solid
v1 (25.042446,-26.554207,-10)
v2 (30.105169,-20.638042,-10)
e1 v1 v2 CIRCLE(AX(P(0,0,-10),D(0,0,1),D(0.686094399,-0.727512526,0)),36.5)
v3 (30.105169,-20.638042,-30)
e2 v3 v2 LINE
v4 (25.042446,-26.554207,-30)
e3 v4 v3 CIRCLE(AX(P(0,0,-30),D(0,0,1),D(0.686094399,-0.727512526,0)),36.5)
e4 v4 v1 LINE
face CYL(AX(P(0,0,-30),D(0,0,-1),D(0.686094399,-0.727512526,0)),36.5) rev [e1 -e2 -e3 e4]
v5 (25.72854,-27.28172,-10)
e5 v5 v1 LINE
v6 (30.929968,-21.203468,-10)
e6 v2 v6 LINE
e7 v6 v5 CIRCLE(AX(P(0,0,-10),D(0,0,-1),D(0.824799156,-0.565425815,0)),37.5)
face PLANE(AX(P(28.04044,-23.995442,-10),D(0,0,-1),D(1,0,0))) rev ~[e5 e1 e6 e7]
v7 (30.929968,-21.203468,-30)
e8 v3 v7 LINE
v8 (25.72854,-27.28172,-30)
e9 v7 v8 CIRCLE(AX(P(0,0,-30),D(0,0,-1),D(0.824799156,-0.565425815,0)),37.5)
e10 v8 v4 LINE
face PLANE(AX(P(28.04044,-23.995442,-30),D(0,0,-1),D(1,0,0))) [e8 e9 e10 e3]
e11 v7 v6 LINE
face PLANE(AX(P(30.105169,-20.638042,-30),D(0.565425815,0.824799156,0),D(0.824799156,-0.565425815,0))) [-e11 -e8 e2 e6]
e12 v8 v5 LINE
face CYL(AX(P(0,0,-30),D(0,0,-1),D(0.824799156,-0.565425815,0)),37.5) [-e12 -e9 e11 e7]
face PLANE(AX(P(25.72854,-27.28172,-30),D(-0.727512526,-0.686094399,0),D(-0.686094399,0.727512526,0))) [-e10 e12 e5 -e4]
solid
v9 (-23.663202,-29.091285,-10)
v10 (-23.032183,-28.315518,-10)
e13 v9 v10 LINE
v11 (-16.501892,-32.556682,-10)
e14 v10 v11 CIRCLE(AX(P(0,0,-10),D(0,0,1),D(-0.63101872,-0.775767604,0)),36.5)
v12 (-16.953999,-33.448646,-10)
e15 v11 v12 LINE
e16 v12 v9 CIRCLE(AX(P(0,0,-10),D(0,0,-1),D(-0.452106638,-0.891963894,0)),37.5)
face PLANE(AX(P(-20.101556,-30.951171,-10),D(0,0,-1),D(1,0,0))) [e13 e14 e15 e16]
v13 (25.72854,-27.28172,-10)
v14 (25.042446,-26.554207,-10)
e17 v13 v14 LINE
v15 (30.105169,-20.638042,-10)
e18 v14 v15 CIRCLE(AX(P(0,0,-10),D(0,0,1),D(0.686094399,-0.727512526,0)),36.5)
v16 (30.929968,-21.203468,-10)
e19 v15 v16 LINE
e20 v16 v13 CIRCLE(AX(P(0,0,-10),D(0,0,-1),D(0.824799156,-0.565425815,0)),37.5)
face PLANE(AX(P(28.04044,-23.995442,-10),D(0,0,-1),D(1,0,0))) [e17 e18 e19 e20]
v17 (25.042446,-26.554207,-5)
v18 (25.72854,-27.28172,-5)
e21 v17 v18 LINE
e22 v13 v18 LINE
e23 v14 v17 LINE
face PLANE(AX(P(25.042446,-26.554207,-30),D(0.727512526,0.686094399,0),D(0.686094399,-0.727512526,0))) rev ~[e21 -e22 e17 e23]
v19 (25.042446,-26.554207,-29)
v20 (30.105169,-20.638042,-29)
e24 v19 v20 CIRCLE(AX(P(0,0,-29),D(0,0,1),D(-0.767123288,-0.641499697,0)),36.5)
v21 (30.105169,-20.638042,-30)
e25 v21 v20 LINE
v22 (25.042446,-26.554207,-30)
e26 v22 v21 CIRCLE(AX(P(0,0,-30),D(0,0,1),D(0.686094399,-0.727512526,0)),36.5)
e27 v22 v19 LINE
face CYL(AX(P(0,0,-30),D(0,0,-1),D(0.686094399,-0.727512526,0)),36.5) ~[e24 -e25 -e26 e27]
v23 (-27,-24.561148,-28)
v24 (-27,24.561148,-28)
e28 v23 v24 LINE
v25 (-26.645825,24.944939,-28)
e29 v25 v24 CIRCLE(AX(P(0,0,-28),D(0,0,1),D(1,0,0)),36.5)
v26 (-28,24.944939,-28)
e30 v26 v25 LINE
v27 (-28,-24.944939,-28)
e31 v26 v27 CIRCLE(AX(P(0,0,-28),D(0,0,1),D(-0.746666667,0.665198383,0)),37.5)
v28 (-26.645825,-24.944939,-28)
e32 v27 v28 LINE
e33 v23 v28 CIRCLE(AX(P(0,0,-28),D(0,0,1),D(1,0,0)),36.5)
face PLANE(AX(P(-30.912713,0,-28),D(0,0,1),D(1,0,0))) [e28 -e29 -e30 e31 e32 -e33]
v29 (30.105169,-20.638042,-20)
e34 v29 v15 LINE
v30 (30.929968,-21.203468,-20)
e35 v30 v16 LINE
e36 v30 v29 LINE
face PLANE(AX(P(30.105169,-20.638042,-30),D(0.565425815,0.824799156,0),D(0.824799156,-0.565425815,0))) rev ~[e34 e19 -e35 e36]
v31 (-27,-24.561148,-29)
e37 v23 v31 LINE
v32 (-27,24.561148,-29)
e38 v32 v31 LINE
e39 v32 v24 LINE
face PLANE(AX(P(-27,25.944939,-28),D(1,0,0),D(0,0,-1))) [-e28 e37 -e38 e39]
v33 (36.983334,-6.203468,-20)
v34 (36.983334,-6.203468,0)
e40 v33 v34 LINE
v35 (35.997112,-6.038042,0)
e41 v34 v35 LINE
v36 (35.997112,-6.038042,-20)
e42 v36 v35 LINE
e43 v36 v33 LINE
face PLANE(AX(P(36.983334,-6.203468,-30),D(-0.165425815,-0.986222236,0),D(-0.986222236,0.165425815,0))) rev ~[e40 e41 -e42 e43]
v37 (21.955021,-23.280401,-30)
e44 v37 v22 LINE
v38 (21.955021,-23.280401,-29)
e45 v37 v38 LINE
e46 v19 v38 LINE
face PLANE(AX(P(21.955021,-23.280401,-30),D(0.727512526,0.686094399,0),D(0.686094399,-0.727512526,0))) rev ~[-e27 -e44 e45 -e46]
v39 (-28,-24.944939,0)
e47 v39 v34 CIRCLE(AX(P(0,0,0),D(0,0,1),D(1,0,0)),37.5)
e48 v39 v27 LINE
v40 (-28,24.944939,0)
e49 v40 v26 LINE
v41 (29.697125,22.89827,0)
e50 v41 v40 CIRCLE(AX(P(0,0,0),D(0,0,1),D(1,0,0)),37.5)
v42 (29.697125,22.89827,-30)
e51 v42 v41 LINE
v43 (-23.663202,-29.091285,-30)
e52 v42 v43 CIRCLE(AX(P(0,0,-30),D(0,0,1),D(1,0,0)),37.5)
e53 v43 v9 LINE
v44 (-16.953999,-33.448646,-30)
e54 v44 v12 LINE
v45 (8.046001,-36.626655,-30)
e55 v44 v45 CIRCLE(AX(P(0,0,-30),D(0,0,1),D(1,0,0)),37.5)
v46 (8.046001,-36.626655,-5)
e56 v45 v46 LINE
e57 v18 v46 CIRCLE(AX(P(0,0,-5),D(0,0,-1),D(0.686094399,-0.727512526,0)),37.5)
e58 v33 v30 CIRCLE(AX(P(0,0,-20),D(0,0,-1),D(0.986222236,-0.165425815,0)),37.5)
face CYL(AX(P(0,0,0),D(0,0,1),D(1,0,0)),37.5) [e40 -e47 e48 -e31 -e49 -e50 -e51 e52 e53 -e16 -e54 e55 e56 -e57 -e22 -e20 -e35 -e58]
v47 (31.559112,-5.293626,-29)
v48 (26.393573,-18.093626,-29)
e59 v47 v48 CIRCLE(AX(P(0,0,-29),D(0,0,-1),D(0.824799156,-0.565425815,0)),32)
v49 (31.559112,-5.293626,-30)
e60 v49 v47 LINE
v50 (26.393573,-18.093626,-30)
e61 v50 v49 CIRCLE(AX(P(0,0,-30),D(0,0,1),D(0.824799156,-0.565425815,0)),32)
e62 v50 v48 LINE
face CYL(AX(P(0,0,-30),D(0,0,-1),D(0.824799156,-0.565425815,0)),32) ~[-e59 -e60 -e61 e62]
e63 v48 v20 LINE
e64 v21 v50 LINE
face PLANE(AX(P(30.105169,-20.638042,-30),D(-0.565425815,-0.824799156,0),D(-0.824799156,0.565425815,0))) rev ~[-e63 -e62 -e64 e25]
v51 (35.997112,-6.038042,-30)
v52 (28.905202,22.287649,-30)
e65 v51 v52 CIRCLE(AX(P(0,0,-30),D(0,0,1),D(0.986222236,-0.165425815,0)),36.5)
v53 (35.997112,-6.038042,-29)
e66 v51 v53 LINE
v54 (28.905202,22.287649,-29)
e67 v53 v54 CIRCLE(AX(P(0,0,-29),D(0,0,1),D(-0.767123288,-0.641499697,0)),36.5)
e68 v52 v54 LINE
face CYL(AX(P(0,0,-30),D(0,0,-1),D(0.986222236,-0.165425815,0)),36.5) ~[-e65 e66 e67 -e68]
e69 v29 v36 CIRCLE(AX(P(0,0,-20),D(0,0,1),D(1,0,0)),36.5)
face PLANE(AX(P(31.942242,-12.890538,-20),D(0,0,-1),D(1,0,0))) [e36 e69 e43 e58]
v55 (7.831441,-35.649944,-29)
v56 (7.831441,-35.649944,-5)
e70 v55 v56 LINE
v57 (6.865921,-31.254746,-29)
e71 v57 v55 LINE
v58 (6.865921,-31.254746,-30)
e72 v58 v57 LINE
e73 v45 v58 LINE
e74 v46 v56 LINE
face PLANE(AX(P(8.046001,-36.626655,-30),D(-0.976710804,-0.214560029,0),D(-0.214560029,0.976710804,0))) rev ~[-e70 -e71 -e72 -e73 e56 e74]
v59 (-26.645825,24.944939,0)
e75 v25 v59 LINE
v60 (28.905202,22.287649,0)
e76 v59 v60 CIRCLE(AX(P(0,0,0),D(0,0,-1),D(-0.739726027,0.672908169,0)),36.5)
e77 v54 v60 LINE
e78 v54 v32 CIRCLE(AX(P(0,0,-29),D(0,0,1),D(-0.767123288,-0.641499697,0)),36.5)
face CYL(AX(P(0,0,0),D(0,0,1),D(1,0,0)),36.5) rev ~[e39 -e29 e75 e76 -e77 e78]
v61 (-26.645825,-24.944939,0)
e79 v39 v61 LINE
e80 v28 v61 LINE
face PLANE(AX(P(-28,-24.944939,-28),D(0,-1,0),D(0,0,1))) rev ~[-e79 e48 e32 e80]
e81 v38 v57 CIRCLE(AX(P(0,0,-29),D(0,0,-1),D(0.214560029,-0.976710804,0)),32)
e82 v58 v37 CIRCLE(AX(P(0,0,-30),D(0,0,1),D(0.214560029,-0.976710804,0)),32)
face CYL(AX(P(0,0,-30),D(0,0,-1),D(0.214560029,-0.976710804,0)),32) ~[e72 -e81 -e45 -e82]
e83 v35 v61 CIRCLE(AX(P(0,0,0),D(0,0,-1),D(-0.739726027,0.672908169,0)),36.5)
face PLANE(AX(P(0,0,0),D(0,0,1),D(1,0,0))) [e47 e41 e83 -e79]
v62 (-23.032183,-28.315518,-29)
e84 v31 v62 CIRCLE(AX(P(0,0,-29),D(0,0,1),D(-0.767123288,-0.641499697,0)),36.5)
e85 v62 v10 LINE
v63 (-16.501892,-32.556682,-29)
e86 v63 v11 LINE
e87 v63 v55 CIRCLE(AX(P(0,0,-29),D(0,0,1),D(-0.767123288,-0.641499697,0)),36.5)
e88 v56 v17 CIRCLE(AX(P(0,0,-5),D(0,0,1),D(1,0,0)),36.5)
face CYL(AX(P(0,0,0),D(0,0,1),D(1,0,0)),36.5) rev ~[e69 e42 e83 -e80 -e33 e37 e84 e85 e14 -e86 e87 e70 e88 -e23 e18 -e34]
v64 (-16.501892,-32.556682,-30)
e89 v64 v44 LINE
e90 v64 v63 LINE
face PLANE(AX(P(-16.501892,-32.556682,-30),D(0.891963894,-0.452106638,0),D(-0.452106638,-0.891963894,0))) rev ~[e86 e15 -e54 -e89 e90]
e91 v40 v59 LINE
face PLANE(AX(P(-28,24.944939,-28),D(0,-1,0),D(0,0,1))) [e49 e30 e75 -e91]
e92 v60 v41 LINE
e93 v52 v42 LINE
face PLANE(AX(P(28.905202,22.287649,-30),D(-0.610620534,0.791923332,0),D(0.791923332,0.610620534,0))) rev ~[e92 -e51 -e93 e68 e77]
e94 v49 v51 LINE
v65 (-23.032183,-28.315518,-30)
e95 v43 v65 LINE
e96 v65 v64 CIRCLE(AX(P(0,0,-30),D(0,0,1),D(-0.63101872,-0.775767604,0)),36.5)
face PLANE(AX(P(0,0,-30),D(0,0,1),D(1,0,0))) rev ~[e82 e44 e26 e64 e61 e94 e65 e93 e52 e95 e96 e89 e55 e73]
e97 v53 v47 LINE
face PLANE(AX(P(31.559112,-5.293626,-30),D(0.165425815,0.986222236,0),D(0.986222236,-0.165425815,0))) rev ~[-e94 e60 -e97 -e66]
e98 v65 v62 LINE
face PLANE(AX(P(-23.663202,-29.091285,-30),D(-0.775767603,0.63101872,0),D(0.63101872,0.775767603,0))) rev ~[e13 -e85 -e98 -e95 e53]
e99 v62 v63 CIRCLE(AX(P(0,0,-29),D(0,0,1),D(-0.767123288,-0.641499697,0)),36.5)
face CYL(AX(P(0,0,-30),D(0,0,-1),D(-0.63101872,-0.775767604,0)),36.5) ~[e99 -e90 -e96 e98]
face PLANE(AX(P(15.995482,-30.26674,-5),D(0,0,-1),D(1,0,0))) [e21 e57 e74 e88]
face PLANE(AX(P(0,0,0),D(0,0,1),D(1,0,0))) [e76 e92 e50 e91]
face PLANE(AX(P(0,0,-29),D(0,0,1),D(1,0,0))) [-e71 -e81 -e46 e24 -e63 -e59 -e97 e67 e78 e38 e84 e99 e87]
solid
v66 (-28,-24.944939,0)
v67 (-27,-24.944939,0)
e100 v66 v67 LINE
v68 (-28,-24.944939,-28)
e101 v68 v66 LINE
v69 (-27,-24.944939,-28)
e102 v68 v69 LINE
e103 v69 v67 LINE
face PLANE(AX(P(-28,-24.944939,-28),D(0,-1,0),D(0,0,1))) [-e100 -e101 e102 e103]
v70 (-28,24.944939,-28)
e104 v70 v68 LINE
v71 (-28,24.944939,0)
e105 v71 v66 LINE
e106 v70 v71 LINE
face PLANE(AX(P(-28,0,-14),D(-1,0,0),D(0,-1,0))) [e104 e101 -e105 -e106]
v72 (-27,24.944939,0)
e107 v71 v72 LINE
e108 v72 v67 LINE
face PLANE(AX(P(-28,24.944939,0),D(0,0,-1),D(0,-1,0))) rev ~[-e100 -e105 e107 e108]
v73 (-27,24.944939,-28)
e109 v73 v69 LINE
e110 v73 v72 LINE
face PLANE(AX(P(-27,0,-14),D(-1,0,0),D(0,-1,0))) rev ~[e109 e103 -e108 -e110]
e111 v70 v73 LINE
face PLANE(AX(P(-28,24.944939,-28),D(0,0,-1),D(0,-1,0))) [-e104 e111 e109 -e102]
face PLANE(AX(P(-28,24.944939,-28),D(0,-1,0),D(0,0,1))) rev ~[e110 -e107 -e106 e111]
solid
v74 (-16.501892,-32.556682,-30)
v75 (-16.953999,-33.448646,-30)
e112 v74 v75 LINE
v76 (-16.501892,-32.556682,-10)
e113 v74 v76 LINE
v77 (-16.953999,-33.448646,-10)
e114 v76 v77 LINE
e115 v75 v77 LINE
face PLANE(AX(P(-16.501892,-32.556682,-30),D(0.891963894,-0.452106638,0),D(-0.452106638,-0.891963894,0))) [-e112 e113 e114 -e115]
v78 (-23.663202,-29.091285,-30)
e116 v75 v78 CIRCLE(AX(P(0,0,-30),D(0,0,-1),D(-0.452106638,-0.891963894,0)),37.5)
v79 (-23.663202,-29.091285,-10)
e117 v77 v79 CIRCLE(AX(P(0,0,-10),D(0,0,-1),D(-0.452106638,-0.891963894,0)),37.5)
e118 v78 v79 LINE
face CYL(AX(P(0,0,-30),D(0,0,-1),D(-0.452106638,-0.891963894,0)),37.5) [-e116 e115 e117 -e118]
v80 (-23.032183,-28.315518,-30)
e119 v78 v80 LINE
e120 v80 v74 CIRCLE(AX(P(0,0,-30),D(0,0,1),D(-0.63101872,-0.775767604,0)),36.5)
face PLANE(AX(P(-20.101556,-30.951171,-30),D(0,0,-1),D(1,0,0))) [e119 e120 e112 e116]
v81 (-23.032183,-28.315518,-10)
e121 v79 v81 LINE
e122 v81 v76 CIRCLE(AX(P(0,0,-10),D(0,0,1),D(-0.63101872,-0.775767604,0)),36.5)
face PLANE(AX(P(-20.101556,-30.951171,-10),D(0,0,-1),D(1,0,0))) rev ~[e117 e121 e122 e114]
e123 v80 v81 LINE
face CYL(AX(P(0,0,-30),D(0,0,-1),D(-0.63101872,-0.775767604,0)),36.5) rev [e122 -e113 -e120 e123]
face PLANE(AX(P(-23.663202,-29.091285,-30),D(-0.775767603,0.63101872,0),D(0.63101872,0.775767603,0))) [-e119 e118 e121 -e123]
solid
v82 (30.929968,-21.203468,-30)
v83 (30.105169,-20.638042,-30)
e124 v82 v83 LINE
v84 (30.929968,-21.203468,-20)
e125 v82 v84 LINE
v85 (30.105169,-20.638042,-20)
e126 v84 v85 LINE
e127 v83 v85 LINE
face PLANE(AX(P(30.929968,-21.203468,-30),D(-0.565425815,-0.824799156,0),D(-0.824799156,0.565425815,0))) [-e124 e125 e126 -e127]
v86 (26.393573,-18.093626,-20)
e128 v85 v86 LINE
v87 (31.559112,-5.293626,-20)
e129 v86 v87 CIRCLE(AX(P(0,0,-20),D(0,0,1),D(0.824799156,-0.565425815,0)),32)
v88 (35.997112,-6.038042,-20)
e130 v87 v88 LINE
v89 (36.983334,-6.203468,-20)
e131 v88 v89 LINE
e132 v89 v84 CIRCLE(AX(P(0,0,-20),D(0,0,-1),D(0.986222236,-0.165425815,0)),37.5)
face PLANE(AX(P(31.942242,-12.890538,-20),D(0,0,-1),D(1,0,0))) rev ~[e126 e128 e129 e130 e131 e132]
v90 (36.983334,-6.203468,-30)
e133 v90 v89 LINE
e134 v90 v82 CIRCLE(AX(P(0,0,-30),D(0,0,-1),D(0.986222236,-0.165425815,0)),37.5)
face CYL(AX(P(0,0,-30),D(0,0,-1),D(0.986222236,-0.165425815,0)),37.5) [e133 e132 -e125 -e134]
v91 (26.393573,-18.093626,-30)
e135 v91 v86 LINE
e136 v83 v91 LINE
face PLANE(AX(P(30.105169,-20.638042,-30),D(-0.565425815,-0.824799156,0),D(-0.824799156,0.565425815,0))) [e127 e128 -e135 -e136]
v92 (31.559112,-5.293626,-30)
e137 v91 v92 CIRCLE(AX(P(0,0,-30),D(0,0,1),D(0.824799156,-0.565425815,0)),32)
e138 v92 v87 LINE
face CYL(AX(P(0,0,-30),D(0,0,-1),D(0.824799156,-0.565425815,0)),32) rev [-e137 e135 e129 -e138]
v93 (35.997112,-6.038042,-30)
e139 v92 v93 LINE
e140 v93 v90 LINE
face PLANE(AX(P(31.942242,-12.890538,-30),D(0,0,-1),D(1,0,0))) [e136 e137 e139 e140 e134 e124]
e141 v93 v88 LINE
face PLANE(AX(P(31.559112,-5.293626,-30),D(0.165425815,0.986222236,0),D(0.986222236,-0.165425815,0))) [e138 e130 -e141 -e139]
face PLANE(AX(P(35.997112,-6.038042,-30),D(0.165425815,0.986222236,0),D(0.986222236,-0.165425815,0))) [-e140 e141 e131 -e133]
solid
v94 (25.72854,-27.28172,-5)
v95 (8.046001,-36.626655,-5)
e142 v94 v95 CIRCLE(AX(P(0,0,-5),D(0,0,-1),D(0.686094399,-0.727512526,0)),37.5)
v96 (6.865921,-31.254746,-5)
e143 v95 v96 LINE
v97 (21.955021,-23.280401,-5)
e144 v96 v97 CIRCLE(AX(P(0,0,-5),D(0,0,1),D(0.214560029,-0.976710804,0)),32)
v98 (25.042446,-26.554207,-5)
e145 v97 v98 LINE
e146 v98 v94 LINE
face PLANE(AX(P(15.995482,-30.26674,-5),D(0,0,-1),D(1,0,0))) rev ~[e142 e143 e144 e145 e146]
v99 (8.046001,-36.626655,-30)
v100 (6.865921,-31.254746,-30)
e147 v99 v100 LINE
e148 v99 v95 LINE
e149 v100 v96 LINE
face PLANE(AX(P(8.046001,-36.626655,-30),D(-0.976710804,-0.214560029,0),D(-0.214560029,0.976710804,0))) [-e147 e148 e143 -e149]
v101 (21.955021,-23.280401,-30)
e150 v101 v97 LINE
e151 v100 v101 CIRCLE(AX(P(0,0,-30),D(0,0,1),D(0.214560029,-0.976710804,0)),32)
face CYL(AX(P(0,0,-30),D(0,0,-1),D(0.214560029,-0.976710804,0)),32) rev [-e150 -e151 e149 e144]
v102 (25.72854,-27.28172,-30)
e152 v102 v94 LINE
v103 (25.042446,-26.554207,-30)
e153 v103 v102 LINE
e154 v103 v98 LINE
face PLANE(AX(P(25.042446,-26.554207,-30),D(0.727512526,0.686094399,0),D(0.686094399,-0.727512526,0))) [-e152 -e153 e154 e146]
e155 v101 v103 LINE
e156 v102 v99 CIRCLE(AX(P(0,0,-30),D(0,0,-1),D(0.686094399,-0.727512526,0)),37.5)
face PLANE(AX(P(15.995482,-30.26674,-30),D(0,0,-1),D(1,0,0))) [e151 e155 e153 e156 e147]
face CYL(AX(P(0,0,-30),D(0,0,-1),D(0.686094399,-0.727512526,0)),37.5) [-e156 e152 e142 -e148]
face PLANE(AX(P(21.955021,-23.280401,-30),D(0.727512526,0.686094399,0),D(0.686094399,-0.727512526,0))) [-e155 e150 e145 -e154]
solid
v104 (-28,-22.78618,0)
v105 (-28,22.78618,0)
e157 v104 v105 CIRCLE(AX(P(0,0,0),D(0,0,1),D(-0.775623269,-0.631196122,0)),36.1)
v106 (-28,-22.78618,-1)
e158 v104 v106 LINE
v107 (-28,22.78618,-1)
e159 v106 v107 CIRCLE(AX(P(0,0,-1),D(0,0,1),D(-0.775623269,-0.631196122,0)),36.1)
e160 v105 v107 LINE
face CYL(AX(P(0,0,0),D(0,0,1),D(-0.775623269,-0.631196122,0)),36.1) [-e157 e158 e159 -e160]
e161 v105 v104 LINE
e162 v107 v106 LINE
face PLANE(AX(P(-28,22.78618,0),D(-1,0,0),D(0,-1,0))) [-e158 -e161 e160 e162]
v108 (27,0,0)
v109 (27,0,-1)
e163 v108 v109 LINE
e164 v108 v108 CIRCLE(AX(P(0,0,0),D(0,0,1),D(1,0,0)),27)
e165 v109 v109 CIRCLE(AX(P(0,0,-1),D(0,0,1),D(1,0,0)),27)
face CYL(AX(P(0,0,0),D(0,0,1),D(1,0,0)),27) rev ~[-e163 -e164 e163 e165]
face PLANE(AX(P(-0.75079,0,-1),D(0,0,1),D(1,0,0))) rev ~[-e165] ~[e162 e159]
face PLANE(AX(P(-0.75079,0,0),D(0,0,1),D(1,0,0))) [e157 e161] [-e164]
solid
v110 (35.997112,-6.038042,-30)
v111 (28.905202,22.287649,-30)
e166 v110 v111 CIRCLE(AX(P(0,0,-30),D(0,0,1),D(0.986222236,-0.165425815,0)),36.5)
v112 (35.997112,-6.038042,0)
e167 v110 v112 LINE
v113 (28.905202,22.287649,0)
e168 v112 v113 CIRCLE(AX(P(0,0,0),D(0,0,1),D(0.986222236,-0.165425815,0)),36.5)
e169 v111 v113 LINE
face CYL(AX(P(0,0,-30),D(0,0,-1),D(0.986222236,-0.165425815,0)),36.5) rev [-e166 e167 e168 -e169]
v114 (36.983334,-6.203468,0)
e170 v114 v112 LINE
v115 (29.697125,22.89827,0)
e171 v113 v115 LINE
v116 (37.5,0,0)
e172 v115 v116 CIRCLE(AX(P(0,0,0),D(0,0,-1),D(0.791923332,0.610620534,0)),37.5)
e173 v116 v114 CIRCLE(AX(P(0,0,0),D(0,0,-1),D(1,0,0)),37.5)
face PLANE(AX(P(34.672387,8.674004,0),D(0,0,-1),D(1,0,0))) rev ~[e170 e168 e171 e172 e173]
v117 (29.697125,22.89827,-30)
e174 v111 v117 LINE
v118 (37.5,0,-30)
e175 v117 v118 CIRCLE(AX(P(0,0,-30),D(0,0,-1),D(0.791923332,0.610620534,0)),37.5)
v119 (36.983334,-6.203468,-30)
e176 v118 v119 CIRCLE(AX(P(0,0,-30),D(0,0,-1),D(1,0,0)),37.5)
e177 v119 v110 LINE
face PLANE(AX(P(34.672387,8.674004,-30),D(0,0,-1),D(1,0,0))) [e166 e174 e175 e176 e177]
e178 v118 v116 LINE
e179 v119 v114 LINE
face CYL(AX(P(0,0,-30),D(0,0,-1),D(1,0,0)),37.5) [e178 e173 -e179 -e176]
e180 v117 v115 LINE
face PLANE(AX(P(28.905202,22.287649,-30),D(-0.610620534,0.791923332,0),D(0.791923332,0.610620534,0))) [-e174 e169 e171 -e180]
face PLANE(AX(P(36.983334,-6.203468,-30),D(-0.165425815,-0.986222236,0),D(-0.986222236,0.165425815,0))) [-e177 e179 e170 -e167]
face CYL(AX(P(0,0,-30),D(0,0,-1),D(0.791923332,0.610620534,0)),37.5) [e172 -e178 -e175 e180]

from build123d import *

# Parameters (mm, degrees)
F0_R        = 37.5
F1_DEPTH    = 30
F3_DEPTH    = 28
F8_T        = 1
F8_T3_DEPTH = 51.8898787331
F9_DEPTH    = 20
F10_DEPTH   = 20
F11_DEPTH   = 25
F12_DEPTH   = 25
F13_DEPTH   = 10
F14_DEPTH   = 10
F15_DEPTH   = 30
F16_DEPTH   = 30
F17_DEPTH   = 20
F18_DEPTH   = 20
F19_W       = 49.8898787331
F19_H       = 28
F20_DEPTH   = 1.3551748111
F21_DEPTH   = 1
F4_R        = 27
F22_DEPTH   = 1


# Not quite as in the source:
# - a shell that OpenCascade refuses in one call is made with other operations: the cavity is built on its own and cut out


with BuildPart() as f1:
    # F0 (on Top) → F1 (new body)
    with BuildSketch(Plane.XY):
        Circle(F0_R)
    extrude(amount=-F1_DEPTH)

    # F2 (on face) → F3 (cut)
    with BuildSketch(Plane.XY):
        with BuildLine():
            Line((-28, -24.9449393665), (-28, 24.9449393665))
            ThreePointArc((-28, 24.9449393665), (-37.5, 0), (-28, -24.9449393665))
        make_face()
    extrude(amount=-F3_DEPTH, mode=Mode.SUBTRACT)

    # F8: shell of thickness 1, made by hand


with BuildPart() as f8_core1:
    # F8_t2: copy of F1
    add(f1.part)

    # the walls: a layer under each face that stays
    f8_faces = [f8_core1.faces().sort_by_distance(p)[0] for p in [
        (18.75, 32.4759526419, -25),
        (-28, 0, -14),
        (-32.75, 0, -28),
        (0, 0, -30),
    ]]
    thicken(f8_faces, amount=-F8_T, mode=Mode.SUBTRACT)

    # F8_s4 → F8_t3 (cut)
    with BuildSketch(Plane.XZ.offset(-25.9449393665)):
        Polygon((-28.01, -27.99), (-27, -28), (-27, -29), (-28, -29), align=None)
    extrude(amount=F8_T3_DEPTH, mode=Mode.SUBTRACT)


with BuildPart() as f1_1:
    add(f1.part)

    # what is left inside the walls is the cavity
    f8_cavity = [f8_core1.part.solids().sort_by_distance(p)[0] for p in [
        (36.49, 0, -19.333333),
    ]]
    add(f8_cavity, mode=Mode.SUBTRACT)

    # F6 (on face) → F9 (cut)
    with BuildSketch(Plane(origin=(0, 0, -30), x_dir=(1, 0, 0), z_dir=(0, 0, -1))):
        with BuildLine():
            ThreePointArc((-16.953998922, 33.4486460197), (-20.4251291644, 31.4493894793), (-23.6632020109, 29.0912851313))
            Line((-23.6632020109, 29.0912851313), (-23.0321832906, 28.3155175278))
            ThreePointArc((-23.0321832906, 28.3155175278), (-19.8804590533, 30.6107390931), (-16.501892284, 32.5566821259))
            Line((-16.501892284, 32.5566821259), (-16.953998922, 33.4486460197))
        make_face()
    extrude(amount=-F9_DEPTH, mode=Mode.SUBTRACT)

    # F7 (on face) → F11 (cut)
    with BuildSketch(Plane(origin=(0, 0, -30), x_dir=(1, 0, 0), z_dir=(0, 0, -1))):
        with BuildLine():
            ThreePointArc((25.7285399775, 27.2817197153), (17.5217539189, 33.1547604365), (8.046001078, 36.6266551387))
            Line((8.046001078, 36.6266551387), (6.8659209199, 31.2547457184))
            ThreePointArc((6.8659209199, 31.2547457184), (14.9518966775, 28.2920622392), (21.9550207808, 23.2804008237))
            Line((21.9550207808, 23.2804008237), (25.0424455781, 26.5542071896))
            Line((25.0424455781, 26.5542071896), (25.7285399775, 27.2817197153))
        make_face()
    extrude(amount=-F11_DEPTH, mode=Mode.SUBTRACT)

    # F7 (on face) → F13 (cut)
    with BuildSketch(Plane(origin=(0, 0, -30), x_dir=(1, 0, 0), z_dir=(0, 0, -1))):
        with BuildLine():
            ThreePointArc((36.9833338658, 6.2034680763), (34.7750507424, 14.0337395539), (30.9299683404, 21.2034680763))
            Line((30.9299683404, 21.2034680763), (30.1051691846, 20.638042261))
            Line((30.1051691846, 20.638042261), (26.3935729838, 18.0936260918))
            ThreePointArc((26.3935729838, 18.0936260918), (29.6747099668, 11.9754577526), (31.5591115654, 5.2936260918))
            Line((31.5591115654, 5.2936260918), (35.9971116293, 6.038042261))
            Line((35.9971116293, 6.038042261), (36.9833338658, 6.2034680763))
        make_face()
    extrude(amount=-F13_DEPTH, mode=Mode.SUBTRACT)

    # F7 (on face) → F15 (cut)
    with BuildSketch(Plane(origin=(0, 0, -30), x_dir=(1, 0, 0), z_dir=(0, 0, -1))):
        with BuildLine():
            Line((28.9052016216, -22.2876494771), (29.6971249537, -22.8982700107))
            ThreePointArc((29.6971249537, -22.8982700107), (35.49571936, -12.0956152021), (37.5, 0))
            ThreePointArc((37.5, 0), (37.3706102437, 3.1124732958), (36.9833338658, 6.2034680763))
            Line((36.9833338658, 6.2034680763), (35.9971116293, 6.038042261))
            ThreePointArc((35.9971116293, 6.038042261), (35.4071146726, -8.8648875097), (28.9052016216, -22.2876494771))
        make_face()
    extrude(amount=-F15_DEPTH, mode=Mode.SUBTRACT)

    # F7 (on face) → F17 (cut)
    with BuildSketch(Plane(origin=(0, 0, -30), x_dir=(1, 0, 0), z_dir=(0, 0, -1))):
        with BuildLine():
            ThreePointArc((30.9299683404, 21.2034680763), (28.4918045576, 24.3816954507), (25.7285399775, 27.2817197153))
            Line((25.7285399775, 27.2817197153), (25.0424455781, 26.5542071896))
            ThreePointArc((25.0424455781, 26.5542071896), (27.7320231027, 23.7315169054), (30.1051691846, 20.638042261))
            Line((30.1051691846, 20.638042261), (30.9299683404, 21.2034680763))
        make_face()
    extrude(amount=-F17_DEPTH, mode=Mode.SUBTRACT)

    # F19 (on face) → F20 (cut, through all)
    with BuildSketch(Plane(origin=(-28, 0, 0), x_dir=(0, -1, 0), z_dir=(-1, 0, 0))):
        with Locations((0, -14)):
            Rectangle(F19_W, F19_H)
    extrude(amount=-F20_DEPTH, mode=Mode.SUBTRACT)


with BuildPart() as f10:
    # F6 (on face) → F10 (new body)
    with BuildSketch(Plane(origin=(0, 0, -30), x_dir=(1, 0, 0), z_dir=(0, 0, -1))):
        with BuildLine():
            ThreePointArc((-16.953998922, 33.4486460197), (-20.4251291644, 31.4493894793), (-23.6632020109, 29.0912851313))
            Line((-23.6632020109, 29.0912851313), (-23.0321832906, 28.3155175278))
            ThreePointArc((-23.0321832906, 28.3155175278), (-19.8804590533, 30.6107390931), (-16.501892284, 32.5566821259))
            Line((-16.501892284, 32.5566821259), (-16.953998922, 33.4486460197))
        make_face()
    extrude(amount=-F10_DEPTH)


with BuildPart() as f12:
    # F7 (on face) → F12 (new body)
    with BuildSketch(Plane(origin=(0, 0, -30), x_dir=(1, 0, 0), z_dir=(0, 0, -1))):
        with BuildLine():
            ThreePointArc((25.7285399775, 27.2817197153), (17.5217539189, 33.1547604365), (8.046001078, 36.6266551387))
            Line((8.046001078, 36.6266551387), (6.8659209199, 31.2547457184))
            ThreePointArc((6.8659209199, 31.2547457184), (14.9518966775, 28.2920622392), (21.9550207808, 23.2804008237))
            Line((21.9550207808, 23.2804008237), (25.0424455781, 26.5542071896))
            Line((25.0424455781, 26.5542071896), (25.7285399775, 27.2817197153))
        make_face()
    extrude(amount=-F12_DEPTH)


with BuildPart() as f14:
    # F7 (on face) → F14 (new body)
    with BuildSketch(Plane(origin=(0, 0, -30), x_dir=(1, 0, 0), z_dir=(0, 0, -1))):
        with BuildLine():
            ThreePointArc((36.9833338658, 6.2034680763), (34.7750507424, 14.0337395539), (30.9299683404, 21.2034680763))
            Line((30.9299683404, 21.2034680763), (30.1051691846, 20.638042261))
            Line((30.1051691846, 20.638042261), (26.3935729838, 18.0936260918))
            ThreePointArc((26.3935729838, 18.0936260918), (29.6747099668, 11.9754577526), (31.5591115654, 5.2936260918))
            Line((31.5591115654, 5.2936260918), (35.9971116293, 6.038042261))
            Line((35.9971116293, 6.038042261), (36.9833338658, 6.2034680763))
        make_face()
    extrude(amount=-F14_DEPTH)


with BuildPart() as f16:
    # F7 (on face) → F16 (new body)
    with BuildSketch(Plane(origin=(0, 0, -30), x_dir=(1, 0, 0), z_dir=(0, 0, -1))):
        with BuildLine():
            Line((28.9052016216, -22.2876494771), (29.6971249537, -22.8982700107))
            ThreePointArc((29.6971249537, -22.8982700107), (35.49571936, -12.0956152021), (37.5, 0))
            ThreePointArc((37.5, 0), (37.3706102437, 3.1124732958), (36.9833338658, 6.2034680763))
            Line((36.9833338658, 6.2034680763), (35.9971116293, 6.038042261))
            ThreePointArc((35.9971116293, 6.038042261), (35.4071146726, -8.8648875097), (28.9052016216, -22.2876494771))
        make_face()
    extrude(amount=-F16_DEPTH)


with BuildPart() as f18:
    # F7 (on face) → F18 (new body)
    with BuildSketch(Plane(origin=(0, 0, -30), x_dir=(1, 0, 0), z_dir=(0, 0, -1))):
        with BuildLine():
            ThreePointArc((30.9299683404, 21.2034680763), (28.4918045576, 24.3816954507), (25.7285399775, 27.2817197153))
            Line((25.7285399775, 27.2817197153), (25.0424455781, 26.5542071896))
            ThreePointArc((25.0424455781, 26.5542071896), (27.7320231027, 23.7315169054), (30.1051691846, 20.638042261))
            Line((30.1051691846, 20.638042261), (30.9299683404, 21.2034680763))
        make_face()
    extrude(amount=-F18_DEPTH)


with BuildPart() as f21:
    # F19 (on face) → F21 (new body)
    with BuildSketch(Plane(origin=(-28, 0, 0), x_dir=(0, -1, 0), z_dir=(-1, 0, 0))):
        with Locations((0, -14)):
            Rectangle(F19_W, F19_H)
    extrude(amount=-F21_DEPTH)


with BuildPart() as f22:
    # F4 (on face) → F22 (new body)
    with BuildSketch(Plane.XY):
        with BuildLine():
            ThreePointArc((-28, -22.7861800221), (36.1, 0), (-28, 22.7861800221))
            Line((-28, 22.7861800221), (-28, -22.7861800221))
        make_face()
        Circle(F4_R, mode=Mode.SUBTRACT)
    extrude(amount=-F22_DEPTH)


solid = Compound([f1_1.part, f10.part, f12.part, f14.part, f16.part, f18.part, f21.part, f22.part])
